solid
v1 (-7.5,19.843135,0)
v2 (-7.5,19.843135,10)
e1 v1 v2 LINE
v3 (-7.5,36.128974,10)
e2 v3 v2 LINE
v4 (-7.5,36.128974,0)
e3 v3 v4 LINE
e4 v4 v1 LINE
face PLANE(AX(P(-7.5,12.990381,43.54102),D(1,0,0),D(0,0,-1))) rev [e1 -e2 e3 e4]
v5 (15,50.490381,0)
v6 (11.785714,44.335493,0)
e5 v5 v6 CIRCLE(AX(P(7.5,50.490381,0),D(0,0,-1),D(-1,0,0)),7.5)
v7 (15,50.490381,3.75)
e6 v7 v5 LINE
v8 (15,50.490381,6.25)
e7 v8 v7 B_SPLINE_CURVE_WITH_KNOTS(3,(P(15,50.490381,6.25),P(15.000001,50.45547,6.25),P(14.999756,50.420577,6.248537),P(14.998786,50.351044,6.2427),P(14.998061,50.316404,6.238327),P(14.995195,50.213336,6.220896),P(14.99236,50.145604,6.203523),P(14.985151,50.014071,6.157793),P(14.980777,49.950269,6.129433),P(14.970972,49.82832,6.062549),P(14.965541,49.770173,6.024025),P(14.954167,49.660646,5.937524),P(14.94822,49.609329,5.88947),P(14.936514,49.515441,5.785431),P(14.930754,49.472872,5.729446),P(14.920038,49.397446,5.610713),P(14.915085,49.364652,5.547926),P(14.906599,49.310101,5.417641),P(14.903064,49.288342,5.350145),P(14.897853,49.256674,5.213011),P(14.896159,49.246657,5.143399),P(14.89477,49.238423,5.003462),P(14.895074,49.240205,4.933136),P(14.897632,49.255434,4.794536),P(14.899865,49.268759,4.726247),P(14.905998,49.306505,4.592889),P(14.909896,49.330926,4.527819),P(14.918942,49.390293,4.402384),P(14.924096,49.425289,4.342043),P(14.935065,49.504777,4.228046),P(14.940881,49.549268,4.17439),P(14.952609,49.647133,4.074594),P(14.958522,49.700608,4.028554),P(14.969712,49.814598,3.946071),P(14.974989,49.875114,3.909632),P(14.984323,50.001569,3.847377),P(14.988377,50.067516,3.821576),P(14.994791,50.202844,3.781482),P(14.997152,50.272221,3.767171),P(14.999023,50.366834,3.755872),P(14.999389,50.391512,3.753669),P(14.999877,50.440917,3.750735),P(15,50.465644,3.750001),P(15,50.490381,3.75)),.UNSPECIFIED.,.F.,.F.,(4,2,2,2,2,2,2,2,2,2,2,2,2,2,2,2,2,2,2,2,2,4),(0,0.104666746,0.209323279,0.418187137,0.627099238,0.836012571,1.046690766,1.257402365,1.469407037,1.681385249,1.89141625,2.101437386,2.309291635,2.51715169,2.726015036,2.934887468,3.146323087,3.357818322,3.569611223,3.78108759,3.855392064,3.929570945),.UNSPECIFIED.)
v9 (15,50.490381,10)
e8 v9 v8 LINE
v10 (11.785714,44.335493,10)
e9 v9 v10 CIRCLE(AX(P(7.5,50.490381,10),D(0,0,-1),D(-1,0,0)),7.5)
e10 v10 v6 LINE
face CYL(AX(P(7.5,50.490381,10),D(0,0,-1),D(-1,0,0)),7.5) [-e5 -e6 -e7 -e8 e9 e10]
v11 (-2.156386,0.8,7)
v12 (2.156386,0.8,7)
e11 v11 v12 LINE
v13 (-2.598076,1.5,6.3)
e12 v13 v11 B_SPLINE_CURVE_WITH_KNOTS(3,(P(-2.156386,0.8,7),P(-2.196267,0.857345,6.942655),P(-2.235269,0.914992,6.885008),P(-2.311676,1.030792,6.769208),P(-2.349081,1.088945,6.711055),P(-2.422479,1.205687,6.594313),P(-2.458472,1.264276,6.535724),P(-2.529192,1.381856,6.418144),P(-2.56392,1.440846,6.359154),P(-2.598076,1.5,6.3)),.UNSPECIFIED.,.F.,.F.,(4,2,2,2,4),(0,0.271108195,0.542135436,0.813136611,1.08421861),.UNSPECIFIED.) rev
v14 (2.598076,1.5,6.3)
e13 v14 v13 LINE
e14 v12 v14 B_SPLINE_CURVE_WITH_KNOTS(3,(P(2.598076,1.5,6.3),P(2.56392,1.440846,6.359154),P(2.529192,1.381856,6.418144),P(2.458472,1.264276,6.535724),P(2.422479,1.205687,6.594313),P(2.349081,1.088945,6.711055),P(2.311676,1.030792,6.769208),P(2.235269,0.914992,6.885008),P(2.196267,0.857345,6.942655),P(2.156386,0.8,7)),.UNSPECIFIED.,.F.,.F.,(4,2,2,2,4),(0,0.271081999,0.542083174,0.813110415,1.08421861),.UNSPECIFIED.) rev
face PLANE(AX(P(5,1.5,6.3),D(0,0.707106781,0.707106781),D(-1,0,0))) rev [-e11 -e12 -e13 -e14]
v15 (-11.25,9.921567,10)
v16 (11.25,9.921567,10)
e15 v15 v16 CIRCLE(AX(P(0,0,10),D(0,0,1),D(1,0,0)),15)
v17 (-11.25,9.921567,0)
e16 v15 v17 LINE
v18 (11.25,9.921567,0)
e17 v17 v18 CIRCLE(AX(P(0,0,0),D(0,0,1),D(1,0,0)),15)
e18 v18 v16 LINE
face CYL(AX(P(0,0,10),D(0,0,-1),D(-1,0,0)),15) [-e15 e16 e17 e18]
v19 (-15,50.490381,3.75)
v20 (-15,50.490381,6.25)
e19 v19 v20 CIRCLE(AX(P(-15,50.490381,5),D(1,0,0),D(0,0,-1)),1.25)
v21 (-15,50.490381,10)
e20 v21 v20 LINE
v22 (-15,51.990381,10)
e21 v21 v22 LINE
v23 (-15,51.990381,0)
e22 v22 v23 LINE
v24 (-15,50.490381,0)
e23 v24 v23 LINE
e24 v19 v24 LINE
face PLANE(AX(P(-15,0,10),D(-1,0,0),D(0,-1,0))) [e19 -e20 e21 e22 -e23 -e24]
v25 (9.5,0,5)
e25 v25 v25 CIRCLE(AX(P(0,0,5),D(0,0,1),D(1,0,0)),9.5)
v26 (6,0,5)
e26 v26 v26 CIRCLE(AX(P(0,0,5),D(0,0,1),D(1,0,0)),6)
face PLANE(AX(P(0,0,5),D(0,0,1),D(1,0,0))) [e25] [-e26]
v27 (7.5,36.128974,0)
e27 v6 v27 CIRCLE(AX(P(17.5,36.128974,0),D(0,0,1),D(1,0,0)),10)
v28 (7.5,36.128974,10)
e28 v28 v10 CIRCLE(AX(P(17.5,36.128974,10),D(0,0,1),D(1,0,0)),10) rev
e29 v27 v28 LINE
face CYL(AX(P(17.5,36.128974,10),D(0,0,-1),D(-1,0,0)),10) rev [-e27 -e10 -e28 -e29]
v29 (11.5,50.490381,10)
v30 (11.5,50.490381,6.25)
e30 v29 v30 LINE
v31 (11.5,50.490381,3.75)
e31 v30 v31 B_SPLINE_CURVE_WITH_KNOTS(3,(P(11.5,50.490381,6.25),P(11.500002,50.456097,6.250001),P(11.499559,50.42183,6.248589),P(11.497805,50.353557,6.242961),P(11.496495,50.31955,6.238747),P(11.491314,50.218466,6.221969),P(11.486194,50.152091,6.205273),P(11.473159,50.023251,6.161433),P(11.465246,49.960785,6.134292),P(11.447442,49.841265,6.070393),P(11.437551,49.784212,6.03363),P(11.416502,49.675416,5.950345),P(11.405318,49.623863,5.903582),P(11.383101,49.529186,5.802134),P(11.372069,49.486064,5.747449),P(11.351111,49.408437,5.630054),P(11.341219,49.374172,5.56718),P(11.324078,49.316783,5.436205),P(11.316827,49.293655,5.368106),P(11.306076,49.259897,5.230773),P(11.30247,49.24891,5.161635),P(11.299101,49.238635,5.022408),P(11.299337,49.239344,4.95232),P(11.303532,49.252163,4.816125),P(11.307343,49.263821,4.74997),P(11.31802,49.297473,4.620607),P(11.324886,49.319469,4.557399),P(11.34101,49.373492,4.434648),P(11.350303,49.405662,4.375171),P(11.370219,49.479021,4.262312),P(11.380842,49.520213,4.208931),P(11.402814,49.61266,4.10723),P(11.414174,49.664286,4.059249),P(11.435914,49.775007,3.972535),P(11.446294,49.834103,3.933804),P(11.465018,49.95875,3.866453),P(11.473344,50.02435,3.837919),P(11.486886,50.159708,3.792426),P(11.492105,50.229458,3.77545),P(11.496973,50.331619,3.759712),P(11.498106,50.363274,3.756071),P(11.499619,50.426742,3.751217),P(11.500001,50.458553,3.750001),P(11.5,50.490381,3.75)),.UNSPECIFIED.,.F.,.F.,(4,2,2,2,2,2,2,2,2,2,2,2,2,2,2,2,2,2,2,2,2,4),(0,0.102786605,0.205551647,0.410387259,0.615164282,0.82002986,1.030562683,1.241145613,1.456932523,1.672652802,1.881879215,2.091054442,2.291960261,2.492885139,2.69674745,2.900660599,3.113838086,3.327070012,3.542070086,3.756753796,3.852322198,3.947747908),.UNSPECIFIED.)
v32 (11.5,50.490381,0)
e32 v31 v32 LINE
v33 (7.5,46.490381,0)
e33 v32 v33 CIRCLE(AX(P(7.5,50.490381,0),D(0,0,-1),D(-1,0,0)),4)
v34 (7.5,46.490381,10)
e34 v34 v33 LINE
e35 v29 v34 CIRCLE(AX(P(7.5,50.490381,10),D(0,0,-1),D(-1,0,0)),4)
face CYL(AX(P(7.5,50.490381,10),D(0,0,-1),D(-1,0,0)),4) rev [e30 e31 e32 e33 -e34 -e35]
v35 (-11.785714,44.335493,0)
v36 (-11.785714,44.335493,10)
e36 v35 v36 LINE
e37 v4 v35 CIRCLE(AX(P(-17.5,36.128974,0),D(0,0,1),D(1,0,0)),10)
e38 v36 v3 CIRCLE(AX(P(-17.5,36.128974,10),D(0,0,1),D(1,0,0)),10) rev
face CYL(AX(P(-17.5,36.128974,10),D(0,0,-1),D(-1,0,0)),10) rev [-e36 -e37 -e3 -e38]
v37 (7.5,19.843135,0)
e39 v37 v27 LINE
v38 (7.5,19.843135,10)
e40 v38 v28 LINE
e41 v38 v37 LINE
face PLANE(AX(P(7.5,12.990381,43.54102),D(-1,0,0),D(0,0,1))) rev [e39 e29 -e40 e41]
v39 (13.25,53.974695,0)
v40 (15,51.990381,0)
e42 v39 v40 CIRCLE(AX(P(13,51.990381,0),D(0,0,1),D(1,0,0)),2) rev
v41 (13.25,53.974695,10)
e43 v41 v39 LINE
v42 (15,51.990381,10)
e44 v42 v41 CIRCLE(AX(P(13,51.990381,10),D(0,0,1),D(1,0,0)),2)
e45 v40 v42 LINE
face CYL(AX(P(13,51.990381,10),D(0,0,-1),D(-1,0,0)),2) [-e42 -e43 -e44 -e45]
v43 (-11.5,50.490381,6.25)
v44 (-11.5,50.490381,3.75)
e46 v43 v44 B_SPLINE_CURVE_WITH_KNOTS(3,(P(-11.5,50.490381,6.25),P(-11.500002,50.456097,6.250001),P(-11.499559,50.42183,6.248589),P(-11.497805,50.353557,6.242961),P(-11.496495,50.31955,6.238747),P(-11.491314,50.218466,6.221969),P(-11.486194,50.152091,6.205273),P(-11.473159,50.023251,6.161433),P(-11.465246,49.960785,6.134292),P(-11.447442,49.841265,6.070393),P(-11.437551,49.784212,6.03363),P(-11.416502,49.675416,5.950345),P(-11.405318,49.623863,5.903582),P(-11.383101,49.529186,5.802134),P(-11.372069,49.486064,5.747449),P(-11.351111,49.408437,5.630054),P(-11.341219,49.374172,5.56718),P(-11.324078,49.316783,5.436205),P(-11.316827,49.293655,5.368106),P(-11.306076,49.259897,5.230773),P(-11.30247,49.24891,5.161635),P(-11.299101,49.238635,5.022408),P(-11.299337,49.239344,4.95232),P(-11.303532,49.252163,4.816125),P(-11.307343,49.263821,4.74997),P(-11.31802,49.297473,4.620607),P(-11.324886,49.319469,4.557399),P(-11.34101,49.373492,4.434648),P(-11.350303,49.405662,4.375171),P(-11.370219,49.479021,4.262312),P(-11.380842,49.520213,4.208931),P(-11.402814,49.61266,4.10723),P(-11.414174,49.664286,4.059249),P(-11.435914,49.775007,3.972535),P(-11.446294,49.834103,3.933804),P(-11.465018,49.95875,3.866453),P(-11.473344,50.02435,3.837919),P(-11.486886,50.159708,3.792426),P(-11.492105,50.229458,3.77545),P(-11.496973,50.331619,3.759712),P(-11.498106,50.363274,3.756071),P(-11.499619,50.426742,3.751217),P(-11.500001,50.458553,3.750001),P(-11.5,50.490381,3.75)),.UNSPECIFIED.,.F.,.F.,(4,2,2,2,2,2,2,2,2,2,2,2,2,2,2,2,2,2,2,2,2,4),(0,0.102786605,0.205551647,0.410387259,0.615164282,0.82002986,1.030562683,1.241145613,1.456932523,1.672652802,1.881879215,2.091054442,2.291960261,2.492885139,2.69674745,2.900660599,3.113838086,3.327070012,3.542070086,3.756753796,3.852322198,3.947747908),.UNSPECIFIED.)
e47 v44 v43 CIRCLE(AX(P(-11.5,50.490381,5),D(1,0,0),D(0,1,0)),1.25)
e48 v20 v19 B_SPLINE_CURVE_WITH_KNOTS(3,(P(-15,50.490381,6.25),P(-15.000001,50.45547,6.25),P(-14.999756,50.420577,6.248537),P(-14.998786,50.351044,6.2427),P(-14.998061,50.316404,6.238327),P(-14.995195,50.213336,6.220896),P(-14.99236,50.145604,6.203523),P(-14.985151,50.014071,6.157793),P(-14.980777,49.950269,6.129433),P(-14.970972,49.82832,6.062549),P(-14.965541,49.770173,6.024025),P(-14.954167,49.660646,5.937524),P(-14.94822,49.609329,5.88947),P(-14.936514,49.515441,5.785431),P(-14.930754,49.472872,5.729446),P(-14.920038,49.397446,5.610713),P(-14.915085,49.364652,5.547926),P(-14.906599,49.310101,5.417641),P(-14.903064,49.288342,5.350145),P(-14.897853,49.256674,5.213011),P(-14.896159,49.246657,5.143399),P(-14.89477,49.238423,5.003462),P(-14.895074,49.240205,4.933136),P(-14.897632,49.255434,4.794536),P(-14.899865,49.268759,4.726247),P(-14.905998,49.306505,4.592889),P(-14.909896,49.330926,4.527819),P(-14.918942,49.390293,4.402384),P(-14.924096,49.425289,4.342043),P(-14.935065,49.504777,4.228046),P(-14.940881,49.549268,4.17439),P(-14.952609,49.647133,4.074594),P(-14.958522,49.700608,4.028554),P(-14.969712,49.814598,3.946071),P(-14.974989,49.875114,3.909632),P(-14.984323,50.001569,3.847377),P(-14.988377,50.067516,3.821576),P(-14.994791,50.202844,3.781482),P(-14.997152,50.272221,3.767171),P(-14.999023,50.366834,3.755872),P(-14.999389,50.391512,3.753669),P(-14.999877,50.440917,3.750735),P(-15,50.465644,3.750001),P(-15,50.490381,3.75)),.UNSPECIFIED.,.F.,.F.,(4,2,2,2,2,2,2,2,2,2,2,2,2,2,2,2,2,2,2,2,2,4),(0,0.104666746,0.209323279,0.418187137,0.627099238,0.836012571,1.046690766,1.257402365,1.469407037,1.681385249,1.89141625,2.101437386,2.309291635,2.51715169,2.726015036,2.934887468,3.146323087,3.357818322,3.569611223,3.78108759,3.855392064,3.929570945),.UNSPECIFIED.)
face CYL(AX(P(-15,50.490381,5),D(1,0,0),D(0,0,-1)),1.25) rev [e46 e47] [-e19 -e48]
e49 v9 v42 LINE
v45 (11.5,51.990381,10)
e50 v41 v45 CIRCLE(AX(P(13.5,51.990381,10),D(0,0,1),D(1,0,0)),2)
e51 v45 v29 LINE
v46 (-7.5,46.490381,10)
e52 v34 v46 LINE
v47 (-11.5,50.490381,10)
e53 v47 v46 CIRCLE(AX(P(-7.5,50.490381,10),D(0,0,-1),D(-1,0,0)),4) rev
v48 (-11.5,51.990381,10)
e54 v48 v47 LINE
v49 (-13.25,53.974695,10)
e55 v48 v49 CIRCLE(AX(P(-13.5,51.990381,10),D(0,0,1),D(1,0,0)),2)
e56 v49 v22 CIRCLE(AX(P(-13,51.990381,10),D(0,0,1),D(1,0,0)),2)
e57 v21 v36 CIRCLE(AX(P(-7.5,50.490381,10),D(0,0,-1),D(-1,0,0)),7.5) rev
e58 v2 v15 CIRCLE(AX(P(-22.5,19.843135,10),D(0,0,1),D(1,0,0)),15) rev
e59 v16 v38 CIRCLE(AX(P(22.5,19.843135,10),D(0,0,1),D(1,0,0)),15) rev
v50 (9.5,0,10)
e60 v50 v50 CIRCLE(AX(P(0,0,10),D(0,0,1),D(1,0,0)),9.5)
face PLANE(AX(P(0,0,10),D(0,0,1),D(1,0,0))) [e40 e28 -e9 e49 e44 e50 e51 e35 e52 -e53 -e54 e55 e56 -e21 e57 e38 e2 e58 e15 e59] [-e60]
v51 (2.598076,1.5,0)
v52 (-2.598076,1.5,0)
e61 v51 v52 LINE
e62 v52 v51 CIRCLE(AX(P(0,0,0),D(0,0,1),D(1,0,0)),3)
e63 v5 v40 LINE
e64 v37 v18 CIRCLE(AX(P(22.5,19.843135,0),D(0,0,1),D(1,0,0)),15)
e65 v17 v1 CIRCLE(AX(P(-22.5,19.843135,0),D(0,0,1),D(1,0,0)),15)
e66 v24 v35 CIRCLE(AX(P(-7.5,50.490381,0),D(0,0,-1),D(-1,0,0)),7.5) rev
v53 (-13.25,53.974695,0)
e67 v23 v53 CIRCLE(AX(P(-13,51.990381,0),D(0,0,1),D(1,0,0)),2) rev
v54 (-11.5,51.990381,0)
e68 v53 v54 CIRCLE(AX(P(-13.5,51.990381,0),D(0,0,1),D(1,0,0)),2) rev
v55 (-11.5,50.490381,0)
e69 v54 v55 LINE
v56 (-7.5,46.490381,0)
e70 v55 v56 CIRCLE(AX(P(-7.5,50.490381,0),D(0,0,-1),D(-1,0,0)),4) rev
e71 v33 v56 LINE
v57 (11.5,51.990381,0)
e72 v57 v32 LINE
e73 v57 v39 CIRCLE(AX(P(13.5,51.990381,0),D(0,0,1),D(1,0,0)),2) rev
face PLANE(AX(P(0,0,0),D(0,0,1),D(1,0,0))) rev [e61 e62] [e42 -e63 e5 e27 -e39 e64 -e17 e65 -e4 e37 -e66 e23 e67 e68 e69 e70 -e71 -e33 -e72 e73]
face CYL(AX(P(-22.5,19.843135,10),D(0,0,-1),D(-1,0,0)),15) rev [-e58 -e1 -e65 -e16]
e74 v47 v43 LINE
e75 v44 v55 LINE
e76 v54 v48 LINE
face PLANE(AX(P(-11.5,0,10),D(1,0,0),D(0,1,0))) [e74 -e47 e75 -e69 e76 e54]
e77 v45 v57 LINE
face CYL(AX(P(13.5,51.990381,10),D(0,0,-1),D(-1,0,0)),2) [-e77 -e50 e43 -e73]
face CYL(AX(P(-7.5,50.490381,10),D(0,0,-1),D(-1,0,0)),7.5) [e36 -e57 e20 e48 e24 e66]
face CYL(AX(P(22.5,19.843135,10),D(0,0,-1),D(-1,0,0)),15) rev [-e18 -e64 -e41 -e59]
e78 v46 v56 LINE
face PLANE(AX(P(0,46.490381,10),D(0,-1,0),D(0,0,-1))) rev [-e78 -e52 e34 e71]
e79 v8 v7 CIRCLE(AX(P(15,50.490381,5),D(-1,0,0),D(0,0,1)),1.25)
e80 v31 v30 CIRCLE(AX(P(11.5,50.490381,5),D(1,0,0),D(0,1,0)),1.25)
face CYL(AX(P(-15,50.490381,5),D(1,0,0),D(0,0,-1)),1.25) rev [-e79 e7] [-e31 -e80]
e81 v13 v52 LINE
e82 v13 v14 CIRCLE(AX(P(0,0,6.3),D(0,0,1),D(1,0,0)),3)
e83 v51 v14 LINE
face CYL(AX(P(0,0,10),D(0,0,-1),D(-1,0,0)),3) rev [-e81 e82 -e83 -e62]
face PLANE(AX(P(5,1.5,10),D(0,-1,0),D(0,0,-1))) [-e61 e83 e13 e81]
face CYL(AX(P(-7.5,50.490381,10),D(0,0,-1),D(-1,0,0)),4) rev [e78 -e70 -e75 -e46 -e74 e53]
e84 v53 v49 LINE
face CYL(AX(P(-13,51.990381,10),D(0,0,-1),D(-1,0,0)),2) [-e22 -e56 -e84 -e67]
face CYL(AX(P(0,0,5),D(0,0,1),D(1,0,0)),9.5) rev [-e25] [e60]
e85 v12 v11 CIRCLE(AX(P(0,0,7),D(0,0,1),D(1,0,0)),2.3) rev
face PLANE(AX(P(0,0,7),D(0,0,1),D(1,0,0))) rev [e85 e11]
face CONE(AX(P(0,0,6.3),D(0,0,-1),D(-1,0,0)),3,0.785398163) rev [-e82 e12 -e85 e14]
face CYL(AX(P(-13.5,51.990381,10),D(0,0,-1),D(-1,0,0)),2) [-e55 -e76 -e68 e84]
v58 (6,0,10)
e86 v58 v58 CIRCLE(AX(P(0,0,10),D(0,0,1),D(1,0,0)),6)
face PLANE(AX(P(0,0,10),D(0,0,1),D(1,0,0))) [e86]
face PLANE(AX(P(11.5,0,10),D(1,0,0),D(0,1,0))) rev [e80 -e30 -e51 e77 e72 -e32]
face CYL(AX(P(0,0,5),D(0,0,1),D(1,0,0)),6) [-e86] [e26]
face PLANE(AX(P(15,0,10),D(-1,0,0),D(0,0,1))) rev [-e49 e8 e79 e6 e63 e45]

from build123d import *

# Parameters (mm, degrees)
SKETCH1_R               = 15
SKETCH1_R_2             = 3
BOSS_EXTRUDE1_DEPTH     = 10
SKETCH2_W               = 15
SKETCH2_H               = 30
BOSS_EXTRUDE2_DEPTH     = 10
FILLET1_R               = 15
SKETCH5_W               = 10
SKETCH5_H               = 2
BOSS_EXTRUDE3_DEPTH     = 10
BOSS_EXTRUDE4_START     = -3
SKETCH7_R               = 3
BOSS_EXTRUDE4_DEPTH     = 3
CHAMFER1_SIZE           = 0.7
BOSS_EXTRUDE6_DEPTH     = 10
FILLET4_R               = 2
FILLET2_R               = 10
CUT_EXTRUDE1_DEPTH      = 63.556116013
CUT_EXTRUDE1_DEPTH_BACK = 63.556116013
SKETCH10_R              = 1.25
SKETCH11_R              = 9.5
SKETCH11_R_2            = 6
CUT_EXTRUDE2_DEPTH      = 5


with BuildPart() as part:
    # Sketch1 → Boss-Extrude1 (new body)
    with BuildSketch(Plane.XY):
        Circle(SKETCH1_R)
        Circle(SKETCH1_R_2, mode=Mode.SUBTRACT)
    extrude(amount=BOSS_EXTRUDE1_DEPTH)

    # Sketch2 → Boss-Extrude2 (add)
    with BuildSketch(Plane.XY):
        with Locations((0, 27.990381057)):
            Rectangle(SKETCH2_W, SKETCH2_H)
    extrude(amount=BOSS_EXTRUDE2_DEPTH)

    # Fillet1
    fillet1_edges = [part.edges().sort_by_distance(p)[0] for p in [
        (-7.5, 12.990381057, 5),
        (7.5, 12.990381057, 5),
    ]]
    fillet(fillet1_edges, radius=FILLET1_R)

    # Sketch5 → Boss-Extrude3 (add)
    with BuildSketch(Plane(origin=(0, 0, 0), x_dir=(-1, 0, 0), z_dir=(0, 0, -1))):
        with Locations((0, 2.5)):
            Rectangle(SKETCH5_W, SKETCH5_H)
    extrude(amount=-BOSS_EXTRUDE3_DEPTH)

    # Sketch7 → Boss-Extrude4 (add)
    with BuildSketch(Plane.XY.offset(10).offset(BOSS_EXTRUDE4_START)):
        Circle(SKETCH7_R)
    extrude(amount=BOSS_EXTRUDE4_DEPTH)

    # Chamfer1
    chamfer1_edges = [part.edges().sort_by_distance(p)[0] for p in [
        (0, 1.5, 7),
        (0, -3, 7),
    ]]
    chamfer(chamfer1_edges, length=CHAMFER1_SIZE)

    # Sketch9 → Boss-Extrude6 (add)
    with BuildSketch(Plane(origin=(0, 0, 0), x_dir=(-1, 0, 0), z_dir=(0, 0, -1))):
        with BuildLine():
            Line((-15, 53.990381057), (-15, 50.490381057))
            ThreePointArc((-15, 50.490381057), (-12.803300859, 45.187080198), (-7.5, 42.990381057))
            Line((-7.5, 42.990381057), (0, 42.990381057))
            Line((0, 42.990381057), (0, 46.490381057))
            Line((0, 46.490381057), (-7.5, 46.490381057))
            ThreePointArc((-7.5, 46.490381057), (-10.328427125, 47.661953932), (-11.5, 50.490381057))
            Line((-11.5, 50.490381057), (-11.5, 53.990381057))
            Line((-11.5, 53.990381057), (-15, 53.990381057))
        make_face()
        with BuildLine():
            Line((0, 46.490381057), (0, 42.990381057))
            Line((0, 42.990381057), (7.5, 42.990381057))
            ThreePointArc((7.5, 42.990381057), (12.803300859, 45.187080198), (15, 50.490381057))
            Line((15, 50.490381057), (15, 53.990381057))
            Line((15, 53.990381057), (11.5, 53.990381057))
            Line((11.5, 53.990381057), (11.5, 50.490381057))
            ThreePointArc((11.5, 50.490381057), (10.328427125, 47.661953932), (7.5, 46.490381057))
            Line((7.5, 46.490381057), (0, 46.490381057))
        make_face()
    extrude(amount=-BOSS_EXTRUDE6_DEPTH)

    # Fillet4
    # the kernel refuses this fillet: 2 mm, written as the material it takes off along each edge
    with BuildSketch(Plane(origin=(11.5, 53.990381057, -5), x_dir=(0, -1, 0), z_dir=(0, 0, 1)), Plane(origin=(15, 53.990381057, -5), x_dir=(-1, 0, 0), z_dir=(0, 0, 1)), Plane(origin=(-11.5, 53.990381057, -5), x_dir=(-1, 0, 0), z_dir=(0, 0, 1)), Plane(origin=(-15, 53.990381057, -5), x_dir=(0, -1, 0), z_dir=(0, 0, 1))) as fillet4_piece_1:
        with BuildLine():
            CenterArc((FILLET4_R, FILLET4_R), FILLET4_R, 180, 90)
            Line((0, FILLET4_R), (0, 0))
            Line((0, 0), (FILLET4_R, 0))
        make_face()
    extrude(amount=20, mode=Mode.SUBTRACT)

    # Fillet2
    fillet2_edges = [part.edges().sort_by_distance(p)[0] for p in [
        (-7.5, 42.990381057, 5),
        (7.5, 42.990381057, 5),
    ]]
    fillet(fillet2_edges, radius=FILLET2_R)

    # Sketch10 → Cut-Extrude1 (cut, two sides: drawn at the far end of the back side and taken through both)
    with BuildSketch(Plane(origin=(15, 0, 0), x_dir=(0, 0, -1), z_dir=(1, 0, 0)).offset(-CUT_EXTRUDE1_DEPTH_BACK)):
        with Locations((-5, 50.490381057)):
            Circle(SKETCH10_R)
    extrude(amount=CUT_EXTRUDE1_DEPTH + CUT_EXTRUDE1_DEPTH_BACK, mode=Mode.SUBTRACT)

    # Sketch11 → Cut-Extrude2 (cut)
    with BuildSketch(Plane.XY.offset(10)):
        Circle(SKETCH11_R)
        Circle(SKETCH11_R_2, mode=Mode.SUBTRACT)
    extrude(amount=-CUT_EXTRUDE2_DEPTH, mode=Mode.SUBTRACT)


solid = part.part
